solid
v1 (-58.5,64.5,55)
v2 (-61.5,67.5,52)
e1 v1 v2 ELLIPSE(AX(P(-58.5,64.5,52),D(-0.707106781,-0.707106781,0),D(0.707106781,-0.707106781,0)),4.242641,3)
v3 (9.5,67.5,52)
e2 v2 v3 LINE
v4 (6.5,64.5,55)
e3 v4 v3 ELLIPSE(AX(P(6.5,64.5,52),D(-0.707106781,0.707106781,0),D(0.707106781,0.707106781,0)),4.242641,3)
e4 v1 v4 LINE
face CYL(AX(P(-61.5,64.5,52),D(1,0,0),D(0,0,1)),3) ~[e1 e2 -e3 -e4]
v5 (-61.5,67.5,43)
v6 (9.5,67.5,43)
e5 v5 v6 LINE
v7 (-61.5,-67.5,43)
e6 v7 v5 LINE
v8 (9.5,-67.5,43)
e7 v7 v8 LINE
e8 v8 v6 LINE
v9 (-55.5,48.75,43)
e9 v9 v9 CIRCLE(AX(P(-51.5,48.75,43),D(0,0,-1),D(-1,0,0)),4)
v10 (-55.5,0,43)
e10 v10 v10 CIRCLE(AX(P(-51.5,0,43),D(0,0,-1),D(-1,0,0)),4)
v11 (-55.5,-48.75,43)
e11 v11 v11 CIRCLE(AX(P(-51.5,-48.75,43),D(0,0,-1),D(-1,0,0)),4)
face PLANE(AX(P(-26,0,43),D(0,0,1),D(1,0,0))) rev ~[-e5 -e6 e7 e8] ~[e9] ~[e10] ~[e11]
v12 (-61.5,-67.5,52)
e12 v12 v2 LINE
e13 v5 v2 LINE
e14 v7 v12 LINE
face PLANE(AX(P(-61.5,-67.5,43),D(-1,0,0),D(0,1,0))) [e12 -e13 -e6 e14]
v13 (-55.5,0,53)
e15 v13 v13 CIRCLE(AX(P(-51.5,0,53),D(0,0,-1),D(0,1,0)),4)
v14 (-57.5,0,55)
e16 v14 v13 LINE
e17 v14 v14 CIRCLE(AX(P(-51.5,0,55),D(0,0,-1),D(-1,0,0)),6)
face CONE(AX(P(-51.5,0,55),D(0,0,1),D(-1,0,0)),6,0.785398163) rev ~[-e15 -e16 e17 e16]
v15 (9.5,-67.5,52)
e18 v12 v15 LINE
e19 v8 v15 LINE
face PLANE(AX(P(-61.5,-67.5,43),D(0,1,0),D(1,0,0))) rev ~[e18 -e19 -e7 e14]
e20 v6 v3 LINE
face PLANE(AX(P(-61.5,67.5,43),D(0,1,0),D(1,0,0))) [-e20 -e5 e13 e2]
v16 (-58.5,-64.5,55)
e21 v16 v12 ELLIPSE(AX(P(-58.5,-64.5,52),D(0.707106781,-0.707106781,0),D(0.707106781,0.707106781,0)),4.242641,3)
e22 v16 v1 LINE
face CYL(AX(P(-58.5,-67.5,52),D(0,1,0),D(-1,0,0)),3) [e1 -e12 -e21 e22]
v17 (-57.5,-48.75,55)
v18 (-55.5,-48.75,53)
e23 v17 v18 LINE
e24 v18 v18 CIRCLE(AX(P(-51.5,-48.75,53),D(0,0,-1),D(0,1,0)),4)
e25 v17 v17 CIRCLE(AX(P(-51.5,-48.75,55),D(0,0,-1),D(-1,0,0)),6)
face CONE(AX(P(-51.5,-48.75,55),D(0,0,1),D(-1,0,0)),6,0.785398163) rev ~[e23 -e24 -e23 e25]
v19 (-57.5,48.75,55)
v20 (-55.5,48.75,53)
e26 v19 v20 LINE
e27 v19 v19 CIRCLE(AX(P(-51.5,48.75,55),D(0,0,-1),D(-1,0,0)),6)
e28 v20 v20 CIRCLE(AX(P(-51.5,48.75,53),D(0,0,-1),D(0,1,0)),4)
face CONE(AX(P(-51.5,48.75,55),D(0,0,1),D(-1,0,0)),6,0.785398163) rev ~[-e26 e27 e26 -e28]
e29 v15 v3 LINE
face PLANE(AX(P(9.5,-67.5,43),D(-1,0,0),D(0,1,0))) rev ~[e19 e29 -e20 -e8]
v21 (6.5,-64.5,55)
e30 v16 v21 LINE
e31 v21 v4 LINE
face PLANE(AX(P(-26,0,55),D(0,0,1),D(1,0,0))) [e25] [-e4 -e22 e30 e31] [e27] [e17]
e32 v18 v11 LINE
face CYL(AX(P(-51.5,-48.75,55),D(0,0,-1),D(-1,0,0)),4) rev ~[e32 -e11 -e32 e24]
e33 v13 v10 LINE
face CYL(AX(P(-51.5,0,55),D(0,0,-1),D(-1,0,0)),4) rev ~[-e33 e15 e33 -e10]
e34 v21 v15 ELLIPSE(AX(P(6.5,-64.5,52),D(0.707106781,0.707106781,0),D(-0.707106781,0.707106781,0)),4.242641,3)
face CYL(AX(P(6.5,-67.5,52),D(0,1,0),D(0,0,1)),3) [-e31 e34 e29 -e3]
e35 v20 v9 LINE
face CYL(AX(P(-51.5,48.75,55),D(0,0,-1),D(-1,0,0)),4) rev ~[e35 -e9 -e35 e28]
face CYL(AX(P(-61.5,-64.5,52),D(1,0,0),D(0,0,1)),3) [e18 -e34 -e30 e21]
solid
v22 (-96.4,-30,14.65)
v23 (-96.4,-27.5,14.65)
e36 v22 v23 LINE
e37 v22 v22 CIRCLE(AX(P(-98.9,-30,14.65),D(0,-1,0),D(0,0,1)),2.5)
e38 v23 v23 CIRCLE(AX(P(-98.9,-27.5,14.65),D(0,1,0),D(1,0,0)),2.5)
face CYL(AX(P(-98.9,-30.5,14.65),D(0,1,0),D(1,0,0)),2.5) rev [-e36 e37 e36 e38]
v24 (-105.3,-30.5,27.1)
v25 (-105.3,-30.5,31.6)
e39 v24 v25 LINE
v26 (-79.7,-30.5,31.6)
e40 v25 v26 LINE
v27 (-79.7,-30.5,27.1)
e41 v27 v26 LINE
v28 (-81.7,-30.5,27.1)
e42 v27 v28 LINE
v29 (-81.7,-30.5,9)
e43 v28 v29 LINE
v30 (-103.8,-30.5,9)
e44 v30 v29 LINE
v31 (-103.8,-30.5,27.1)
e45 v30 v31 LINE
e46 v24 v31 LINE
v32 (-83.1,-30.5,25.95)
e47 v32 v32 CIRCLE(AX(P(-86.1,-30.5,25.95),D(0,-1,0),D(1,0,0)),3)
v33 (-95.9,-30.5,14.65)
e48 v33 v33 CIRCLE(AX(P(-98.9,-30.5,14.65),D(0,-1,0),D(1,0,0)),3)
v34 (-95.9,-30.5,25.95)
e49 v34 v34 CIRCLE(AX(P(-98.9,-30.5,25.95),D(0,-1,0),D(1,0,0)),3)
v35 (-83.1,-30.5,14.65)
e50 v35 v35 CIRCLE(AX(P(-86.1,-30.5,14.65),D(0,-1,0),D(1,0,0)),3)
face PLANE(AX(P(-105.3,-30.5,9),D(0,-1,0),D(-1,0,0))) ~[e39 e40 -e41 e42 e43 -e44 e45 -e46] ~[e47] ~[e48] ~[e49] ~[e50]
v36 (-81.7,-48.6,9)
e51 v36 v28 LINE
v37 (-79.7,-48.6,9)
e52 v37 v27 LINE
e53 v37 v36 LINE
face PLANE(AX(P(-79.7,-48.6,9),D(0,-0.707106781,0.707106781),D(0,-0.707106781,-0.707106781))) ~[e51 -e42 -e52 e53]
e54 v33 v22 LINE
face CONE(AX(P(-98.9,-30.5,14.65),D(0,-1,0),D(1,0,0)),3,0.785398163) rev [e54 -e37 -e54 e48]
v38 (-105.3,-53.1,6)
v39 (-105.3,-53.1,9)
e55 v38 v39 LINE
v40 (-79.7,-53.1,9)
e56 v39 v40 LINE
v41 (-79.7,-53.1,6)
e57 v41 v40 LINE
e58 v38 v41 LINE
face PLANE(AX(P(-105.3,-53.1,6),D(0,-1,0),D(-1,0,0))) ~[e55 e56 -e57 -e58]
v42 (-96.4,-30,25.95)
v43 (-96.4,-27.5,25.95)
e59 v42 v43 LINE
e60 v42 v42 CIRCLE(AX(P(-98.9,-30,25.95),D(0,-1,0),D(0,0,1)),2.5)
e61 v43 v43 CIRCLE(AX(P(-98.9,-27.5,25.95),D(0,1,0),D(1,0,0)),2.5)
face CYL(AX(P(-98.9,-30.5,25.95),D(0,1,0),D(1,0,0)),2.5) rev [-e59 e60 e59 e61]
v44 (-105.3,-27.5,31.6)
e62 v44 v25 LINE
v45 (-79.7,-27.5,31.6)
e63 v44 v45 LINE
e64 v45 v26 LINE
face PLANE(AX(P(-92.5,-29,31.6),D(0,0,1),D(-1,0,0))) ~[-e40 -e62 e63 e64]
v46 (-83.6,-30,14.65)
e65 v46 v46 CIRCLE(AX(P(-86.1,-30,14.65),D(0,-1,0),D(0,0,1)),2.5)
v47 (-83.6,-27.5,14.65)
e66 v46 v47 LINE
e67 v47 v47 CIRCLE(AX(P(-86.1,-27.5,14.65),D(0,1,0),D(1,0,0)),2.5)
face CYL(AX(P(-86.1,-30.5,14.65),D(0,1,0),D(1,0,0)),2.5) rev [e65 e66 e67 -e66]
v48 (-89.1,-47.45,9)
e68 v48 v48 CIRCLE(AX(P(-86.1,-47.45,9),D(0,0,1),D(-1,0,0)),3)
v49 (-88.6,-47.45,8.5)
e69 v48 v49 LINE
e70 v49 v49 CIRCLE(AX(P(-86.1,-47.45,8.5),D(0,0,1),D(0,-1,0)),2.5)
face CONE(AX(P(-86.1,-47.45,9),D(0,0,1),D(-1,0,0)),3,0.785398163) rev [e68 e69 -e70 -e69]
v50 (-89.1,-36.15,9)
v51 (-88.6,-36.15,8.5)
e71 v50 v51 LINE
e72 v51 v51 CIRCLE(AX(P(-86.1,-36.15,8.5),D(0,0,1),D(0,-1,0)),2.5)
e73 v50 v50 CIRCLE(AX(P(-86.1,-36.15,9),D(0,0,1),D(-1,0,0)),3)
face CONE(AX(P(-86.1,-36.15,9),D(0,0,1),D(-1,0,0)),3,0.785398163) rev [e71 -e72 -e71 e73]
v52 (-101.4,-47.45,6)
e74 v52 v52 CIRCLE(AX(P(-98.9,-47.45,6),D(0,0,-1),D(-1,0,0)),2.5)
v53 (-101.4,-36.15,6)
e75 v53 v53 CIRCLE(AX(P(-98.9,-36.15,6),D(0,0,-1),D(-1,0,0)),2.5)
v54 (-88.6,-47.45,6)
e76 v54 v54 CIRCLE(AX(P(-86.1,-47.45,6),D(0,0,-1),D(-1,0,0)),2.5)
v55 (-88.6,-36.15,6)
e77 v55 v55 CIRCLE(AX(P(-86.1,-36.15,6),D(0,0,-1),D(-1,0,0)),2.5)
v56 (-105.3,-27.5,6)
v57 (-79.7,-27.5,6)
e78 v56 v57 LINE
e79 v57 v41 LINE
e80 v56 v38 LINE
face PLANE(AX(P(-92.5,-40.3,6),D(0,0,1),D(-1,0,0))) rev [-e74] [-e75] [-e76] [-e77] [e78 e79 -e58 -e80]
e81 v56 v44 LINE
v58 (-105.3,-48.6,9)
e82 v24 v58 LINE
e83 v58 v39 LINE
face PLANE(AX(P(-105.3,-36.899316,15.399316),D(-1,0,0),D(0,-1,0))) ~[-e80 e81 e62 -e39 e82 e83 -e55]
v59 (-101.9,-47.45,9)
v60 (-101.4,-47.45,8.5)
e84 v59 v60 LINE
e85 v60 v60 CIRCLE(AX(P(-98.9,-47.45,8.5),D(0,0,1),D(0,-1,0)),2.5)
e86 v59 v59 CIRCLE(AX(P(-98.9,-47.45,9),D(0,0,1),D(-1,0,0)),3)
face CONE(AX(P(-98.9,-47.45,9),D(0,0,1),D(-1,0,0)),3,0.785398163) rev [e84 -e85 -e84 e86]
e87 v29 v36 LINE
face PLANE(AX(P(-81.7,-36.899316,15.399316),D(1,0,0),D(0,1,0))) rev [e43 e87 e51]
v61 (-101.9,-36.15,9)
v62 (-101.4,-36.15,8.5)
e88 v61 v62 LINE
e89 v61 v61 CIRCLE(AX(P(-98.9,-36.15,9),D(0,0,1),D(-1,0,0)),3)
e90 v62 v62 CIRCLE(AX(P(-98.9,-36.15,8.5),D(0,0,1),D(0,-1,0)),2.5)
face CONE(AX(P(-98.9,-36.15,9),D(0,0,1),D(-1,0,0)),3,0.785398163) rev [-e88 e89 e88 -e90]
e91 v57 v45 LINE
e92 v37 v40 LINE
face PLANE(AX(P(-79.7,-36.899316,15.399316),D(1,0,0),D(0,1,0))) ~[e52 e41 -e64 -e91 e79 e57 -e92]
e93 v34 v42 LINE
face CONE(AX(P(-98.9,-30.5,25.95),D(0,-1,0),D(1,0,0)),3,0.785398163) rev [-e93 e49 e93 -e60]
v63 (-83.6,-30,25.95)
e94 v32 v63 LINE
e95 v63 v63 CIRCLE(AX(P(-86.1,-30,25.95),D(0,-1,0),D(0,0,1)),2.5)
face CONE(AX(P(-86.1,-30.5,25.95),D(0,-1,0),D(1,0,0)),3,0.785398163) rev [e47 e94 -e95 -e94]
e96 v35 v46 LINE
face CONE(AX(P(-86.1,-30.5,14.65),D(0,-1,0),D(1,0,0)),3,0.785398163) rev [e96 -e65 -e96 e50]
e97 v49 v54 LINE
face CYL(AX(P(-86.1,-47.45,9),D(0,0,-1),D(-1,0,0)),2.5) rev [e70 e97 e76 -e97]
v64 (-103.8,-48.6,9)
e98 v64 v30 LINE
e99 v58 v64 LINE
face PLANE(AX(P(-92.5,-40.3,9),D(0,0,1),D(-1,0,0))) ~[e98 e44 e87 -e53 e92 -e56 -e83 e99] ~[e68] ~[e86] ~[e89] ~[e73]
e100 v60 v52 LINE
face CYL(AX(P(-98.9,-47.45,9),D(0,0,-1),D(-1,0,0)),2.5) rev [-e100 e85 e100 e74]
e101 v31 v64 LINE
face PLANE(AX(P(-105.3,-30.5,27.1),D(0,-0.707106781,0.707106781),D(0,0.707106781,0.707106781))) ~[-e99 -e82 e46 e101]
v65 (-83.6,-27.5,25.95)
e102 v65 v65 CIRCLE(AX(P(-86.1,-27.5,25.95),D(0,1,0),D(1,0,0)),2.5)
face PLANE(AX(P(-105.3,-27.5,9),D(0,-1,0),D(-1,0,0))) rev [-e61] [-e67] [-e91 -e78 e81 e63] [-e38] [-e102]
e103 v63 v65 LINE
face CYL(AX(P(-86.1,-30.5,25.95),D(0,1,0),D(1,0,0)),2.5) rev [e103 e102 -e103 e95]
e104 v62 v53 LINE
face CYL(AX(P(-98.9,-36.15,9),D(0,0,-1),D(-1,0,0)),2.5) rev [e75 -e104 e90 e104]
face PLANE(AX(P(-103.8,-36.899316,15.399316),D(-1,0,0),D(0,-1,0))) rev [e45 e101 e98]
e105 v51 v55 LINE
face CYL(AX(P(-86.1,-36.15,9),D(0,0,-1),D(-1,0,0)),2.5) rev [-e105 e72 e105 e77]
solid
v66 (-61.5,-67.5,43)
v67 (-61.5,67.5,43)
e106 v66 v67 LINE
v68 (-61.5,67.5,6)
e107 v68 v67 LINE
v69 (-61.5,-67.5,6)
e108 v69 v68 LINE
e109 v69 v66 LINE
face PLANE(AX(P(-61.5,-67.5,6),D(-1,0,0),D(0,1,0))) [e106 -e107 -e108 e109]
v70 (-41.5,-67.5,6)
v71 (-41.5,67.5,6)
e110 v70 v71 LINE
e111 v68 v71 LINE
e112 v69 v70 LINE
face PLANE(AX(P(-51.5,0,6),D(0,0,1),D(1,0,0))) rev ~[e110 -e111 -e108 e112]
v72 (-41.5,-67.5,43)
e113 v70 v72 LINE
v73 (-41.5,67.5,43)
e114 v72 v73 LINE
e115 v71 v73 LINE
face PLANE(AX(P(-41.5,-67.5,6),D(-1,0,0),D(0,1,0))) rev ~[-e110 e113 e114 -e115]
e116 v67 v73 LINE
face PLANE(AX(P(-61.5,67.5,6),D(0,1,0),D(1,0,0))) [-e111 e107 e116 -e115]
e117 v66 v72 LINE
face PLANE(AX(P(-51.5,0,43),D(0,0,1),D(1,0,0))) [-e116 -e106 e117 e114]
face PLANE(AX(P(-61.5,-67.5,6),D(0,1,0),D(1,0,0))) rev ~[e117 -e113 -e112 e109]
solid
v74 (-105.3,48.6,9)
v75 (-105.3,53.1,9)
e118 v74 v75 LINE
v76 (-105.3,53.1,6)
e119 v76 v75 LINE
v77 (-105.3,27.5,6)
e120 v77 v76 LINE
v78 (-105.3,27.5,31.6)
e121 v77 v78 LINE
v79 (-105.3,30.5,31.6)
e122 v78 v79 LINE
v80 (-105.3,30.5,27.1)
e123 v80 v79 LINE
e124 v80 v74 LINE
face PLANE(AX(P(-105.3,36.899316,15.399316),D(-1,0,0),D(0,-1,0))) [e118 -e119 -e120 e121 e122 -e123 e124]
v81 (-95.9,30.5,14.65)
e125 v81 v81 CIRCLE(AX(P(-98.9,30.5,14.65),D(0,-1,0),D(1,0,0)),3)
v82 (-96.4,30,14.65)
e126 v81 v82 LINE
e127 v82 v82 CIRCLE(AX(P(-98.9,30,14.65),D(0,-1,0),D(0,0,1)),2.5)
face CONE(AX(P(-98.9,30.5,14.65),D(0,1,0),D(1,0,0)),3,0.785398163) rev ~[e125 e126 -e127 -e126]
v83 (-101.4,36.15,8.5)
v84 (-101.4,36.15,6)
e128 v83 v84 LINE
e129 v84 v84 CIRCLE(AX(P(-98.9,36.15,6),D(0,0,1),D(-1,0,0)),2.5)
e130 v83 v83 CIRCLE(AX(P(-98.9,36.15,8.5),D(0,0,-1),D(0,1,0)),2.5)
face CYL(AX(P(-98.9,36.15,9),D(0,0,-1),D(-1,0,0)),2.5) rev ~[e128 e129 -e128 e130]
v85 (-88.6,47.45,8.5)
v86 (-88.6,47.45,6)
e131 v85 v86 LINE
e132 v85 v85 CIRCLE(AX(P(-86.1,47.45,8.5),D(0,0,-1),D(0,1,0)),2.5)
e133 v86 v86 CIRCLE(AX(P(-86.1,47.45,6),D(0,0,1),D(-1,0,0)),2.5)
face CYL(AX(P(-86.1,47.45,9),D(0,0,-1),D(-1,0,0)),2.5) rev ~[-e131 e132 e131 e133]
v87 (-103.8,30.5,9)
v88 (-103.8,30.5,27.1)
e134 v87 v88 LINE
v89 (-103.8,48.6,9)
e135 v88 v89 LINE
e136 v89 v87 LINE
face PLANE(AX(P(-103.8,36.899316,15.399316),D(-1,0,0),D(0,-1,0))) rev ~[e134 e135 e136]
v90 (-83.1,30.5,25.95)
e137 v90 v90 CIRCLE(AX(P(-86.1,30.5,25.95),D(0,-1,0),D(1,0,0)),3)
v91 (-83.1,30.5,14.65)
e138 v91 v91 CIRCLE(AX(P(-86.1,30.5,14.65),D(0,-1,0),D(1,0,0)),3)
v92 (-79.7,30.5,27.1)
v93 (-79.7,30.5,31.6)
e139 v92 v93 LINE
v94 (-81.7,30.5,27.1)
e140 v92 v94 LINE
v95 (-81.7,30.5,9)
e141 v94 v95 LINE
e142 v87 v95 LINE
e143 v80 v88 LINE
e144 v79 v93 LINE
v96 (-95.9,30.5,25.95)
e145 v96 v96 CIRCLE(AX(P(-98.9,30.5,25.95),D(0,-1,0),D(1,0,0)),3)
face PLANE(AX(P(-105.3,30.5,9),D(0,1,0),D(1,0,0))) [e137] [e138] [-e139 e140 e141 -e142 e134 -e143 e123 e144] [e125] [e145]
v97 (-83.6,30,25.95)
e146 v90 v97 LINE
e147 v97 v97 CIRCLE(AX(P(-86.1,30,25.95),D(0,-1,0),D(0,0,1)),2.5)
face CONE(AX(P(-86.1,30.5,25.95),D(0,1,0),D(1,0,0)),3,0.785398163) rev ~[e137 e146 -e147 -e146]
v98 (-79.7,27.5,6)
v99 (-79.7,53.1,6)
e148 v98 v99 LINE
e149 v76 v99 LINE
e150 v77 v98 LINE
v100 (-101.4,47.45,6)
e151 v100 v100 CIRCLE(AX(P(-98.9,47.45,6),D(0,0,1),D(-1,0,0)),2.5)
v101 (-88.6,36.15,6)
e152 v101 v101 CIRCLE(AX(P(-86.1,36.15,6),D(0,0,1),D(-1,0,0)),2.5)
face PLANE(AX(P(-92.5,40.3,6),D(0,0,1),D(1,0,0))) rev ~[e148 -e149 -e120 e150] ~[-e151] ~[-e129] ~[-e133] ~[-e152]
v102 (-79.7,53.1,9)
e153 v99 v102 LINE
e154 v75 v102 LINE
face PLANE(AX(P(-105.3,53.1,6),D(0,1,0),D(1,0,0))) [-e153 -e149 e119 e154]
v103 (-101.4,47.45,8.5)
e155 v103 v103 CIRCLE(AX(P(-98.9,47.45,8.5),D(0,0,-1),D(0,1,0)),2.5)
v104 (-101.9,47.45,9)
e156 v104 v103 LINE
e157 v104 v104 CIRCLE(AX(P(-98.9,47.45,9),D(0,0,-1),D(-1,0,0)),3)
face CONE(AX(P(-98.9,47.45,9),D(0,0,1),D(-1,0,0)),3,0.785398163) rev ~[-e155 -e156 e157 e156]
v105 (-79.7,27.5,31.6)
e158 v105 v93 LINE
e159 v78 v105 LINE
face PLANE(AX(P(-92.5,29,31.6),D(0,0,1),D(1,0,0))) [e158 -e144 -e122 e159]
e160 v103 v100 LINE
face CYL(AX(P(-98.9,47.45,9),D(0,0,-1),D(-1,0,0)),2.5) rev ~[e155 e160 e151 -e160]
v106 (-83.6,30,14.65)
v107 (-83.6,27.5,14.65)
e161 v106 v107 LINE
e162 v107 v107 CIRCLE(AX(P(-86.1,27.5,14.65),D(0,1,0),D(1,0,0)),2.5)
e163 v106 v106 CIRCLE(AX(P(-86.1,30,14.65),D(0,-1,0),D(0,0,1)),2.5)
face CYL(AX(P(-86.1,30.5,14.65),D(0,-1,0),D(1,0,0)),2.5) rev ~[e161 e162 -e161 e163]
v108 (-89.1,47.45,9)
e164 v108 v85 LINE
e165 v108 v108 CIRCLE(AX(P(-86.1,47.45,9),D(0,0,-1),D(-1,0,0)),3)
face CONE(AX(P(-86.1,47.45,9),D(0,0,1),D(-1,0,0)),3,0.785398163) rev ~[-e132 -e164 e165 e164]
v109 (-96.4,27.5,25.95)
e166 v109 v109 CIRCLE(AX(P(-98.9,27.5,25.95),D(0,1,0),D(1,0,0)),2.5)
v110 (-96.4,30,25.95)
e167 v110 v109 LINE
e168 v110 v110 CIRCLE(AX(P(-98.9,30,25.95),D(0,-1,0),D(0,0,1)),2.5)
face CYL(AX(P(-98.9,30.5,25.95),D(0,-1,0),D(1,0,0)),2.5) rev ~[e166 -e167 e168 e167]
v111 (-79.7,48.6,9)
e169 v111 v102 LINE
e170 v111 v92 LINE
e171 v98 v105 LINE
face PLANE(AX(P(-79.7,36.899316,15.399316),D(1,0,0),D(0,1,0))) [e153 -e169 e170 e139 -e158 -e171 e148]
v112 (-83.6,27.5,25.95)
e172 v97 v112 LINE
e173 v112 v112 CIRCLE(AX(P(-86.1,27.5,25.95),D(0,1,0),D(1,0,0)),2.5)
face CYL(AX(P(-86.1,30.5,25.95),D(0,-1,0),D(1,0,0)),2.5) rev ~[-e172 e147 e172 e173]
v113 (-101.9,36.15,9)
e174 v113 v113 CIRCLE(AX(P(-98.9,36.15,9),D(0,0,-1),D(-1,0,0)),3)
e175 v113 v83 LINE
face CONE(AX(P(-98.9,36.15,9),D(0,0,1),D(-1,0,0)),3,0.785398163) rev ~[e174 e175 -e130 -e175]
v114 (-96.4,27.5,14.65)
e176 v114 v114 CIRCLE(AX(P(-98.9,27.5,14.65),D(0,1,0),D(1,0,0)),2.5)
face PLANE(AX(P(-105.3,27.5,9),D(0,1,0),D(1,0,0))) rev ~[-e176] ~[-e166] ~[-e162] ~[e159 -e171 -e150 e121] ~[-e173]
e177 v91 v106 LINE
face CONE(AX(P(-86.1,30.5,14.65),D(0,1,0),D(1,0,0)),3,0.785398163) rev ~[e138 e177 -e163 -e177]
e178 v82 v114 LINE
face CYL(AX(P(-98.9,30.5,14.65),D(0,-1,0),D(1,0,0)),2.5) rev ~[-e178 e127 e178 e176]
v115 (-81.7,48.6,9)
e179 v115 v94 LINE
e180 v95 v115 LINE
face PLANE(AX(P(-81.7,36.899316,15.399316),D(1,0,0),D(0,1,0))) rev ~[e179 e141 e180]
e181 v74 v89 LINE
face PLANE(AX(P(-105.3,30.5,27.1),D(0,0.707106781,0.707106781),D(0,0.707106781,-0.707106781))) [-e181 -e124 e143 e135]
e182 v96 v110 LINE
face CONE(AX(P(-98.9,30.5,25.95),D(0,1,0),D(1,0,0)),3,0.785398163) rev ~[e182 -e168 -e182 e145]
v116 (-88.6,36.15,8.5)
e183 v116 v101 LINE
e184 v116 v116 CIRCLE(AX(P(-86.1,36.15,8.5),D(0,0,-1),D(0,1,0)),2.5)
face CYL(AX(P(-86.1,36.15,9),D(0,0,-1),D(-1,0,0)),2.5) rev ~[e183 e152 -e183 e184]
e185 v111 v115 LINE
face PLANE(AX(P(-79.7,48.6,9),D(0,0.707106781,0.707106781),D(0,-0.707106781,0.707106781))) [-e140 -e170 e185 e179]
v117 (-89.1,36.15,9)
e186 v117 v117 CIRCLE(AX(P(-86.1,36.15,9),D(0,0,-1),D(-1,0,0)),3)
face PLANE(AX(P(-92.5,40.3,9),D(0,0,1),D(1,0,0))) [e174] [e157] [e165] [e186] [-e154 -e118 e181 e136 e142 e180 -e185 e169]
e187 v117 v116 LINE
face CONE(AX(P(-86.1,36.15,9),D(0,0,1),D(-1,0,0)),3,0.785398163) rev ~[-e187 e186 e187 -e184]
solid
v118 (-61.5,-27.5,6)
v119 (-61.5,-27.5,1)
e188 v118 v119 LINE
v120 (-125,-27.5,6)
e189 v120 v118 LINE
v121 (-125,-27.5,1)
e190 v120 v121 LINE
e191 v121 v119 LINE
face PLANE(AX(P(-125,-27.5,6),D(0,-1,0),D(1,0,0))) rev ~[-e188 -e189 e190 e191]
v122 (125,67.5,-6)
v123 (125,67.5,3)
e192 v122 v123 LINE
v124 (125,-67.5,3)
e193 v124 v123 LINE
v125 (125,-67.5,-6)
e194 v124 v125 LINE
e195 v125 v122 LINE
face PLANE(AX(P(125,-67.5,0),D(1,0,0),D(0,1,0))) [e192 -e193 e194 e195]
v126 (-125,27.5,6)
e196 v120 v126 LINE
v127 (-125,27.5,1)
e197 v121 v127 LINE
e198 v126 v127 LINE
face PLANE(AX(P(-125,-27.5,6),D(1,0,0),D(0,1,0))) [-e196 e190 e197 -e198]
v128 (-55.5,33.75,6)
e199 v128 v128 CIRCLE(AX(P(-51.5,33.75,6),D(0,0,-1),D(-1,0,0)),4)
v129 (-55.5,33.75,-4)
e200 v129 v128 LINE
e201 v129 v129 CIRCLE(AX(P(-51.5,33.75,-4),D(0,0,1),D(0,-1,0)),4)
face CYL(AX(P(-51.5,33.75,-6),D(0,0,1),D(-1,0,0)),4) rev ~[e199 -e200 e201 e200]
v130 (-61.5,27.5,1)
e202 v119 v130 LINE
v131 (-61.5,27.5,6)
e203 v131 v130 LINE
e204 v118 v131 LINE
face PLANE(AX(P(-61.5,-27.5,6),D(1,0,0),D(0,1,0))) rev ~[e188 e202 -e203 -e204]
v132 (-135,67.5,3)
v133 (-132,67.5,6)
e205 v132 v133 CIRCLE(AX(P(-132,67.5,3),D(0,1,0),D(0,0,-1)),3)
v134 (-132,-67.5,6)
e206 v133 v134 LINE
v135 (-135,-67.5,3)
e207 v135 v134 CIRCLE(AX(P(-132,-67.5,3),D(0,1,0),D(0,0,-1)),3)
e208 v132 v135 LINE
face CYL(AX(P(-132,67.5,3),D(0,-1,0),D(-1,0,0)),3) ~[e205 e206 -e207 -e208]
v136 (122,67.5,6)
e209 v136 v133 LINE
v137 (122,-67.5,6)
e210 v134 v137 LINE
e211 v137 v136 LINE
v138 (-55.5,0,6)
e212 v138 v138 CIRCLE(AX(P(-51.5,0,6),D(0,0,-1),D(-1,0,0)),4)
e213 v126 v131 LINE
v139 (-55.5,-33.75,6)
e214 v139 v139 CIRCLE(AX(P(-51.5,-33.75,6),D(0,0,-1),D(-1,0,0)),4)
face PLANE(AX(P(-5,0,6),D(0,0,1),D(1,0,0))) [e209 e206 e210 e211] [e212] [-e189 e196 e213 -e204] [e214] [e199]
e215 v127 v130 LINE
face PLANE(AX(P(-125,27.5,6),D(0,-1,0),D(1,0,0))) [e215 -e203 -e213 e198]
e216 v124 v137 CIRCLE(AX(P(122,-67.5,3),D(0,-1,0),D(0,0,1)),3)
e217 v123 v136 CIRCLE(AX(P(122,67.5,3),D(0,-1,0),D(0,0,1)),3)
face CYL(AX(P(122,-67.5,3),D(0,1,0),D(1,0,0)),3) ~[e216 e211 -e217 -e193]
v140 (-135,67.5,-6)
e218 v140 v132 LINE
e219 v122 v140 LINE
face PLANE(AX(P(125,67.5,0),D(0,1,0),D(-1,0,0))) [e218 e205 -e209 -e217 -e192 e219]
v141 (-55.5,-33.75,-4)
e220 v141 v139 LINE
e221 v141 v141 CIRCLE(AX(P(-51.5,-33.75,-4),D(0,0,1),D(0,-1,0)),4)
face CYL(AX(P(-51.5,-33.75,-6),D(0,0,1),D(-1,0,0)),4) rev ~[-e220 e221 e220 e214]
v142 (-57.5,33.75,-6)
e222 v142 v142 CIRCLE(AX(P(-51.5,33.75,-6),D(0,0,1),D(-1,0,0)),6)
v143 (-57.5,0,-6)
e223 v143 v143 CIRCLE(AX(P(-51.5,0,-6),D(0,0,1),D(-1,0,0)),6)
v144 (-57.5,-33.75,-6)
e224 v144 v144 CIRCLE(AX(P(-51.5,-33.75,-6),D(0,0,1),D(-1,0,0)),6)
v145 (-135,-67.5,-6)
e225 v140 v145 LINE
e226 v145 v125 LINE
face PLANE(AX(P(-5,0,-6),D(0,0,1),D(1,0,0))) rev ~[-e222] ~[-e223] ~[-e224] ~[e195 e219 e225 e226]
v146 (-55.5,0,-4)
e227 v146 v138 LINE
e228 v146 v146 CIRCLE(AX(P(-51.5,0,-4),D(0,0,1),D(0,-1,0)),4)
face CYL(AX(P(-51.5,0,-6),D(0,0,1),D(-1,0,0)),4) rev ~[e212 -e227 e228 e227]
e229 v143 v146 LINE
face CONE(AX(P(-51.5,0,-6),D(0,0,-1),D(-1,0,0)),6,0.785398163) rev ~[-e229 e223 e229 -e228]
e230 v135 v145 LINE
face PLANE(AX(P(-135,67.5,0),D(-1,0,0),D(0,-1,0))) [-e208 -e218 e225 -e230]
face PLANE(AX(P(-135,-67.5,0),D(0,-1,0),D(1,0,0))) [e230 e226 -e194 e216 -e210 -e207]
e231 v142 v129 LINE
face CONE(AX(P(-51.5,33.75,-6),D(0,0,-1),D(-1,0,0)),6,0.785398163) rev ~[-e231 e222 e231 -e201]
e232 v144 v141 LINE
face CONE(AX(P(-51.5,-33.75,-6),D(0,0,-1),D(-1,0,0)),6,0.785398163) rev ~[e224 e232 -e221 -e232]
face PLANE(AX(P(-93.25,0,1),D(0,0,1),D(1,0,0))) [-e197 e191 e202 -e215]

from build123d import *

# Parameters (mm, degrees)
F1_DEPTH        = 6
F2_W            = 63.5
F2_H            = 55
F3_DEPTH        = 5
F4_W            = 20
F4_H            = 135
F5_DEPTH        = 37
F7_D            = 8
F7_DEPTH        = 12
F7_CSINK_D      = 12
F7_CSINK_ANGLE  = 90
F7_TIP          = 2.4034424761
F8_W            = 71
F8_H            = 135
F9_DEPTH        = 12
F11_D           = 8
F11_DEPTH       = 12
F11_CSINK_D     = 12
F11_CSINK_ANGLE = 90
F11_TIP         = 2.4034424761
F12_R           = 3
F12_2_R         = 3
F13_W           = 25.6
F13_H           = 25.6
F14_DEPTH       = 3
F15_W           = 25.6
F15_H           = 3
F16_DEPTH       = 22.6
F18_D           = 5
F18_DEPTH       = 3
F18_CSINK_D     = 6
F18_CSINK_ANGLE = 90
F18_TIP         = 1.5021515476
F20_D           = 5
F20_DEPTH       = 3
F20_CSINK_D     = 6
F20_CSINK_ANGLE = 90
F20_TIP         = 1.5021515476
F22_DEPTH       = 1.5
F24_DEPTH       = 2


# Not quite as in the source:
# - a feature names something its author has since deleted; it is built from what else it names


with BuildPart() as f1:
    # F0 (on Top) → F1 (new body, symmetric)
    with BuildSketch(Plane.XY):
        Polygon((125, -67.5), (125, 67.5), (-125, 67.5), (-135, 67.5), (-135, -67.5), align=None)
    extrude(amount=F1_DEPTH, both=True)

    # F2 (on face) → F3 (cut)
    with BuildSketch(Plane.XY.offset(6)):
        with Locations((-93.25, 0)):
            Rectangle(F2_W, F2_H)
    extrude(amount=-F3_DEPTH, mode=Mode.SUBTRACT)

    # F7
    with Locations(Plane(origin=(0, 0, -6), x_dir=(1, 0, 0), z_dir=(0, 0, -1))):
        with Locations((-51.5, 33.75), (-51.5, 0), (-51.5, -33.75)):
            CounterSinkHole(F7_D / 2, F7_CSINK_D / 2, depth=F7_DEPTH, counter_sink_angle=F7_CSINK_ANGLE)
            with Locations((0, 0, -(F7_DEPTH + F7_TIP / 2))):  # 118° drill point
                Cone(0, F7_D / 2, F7_TIP, mode=Mode.SUBTRACT)

    # F12
    f12_edges = [f1.edges().sort_by_distance(p)[0] for p in [
        (125, 0, 6),
        (-135, 0, 6),
    ]]
    fillet(f12_edges, radius=F12_R)


with BuildPart() as f5:
    # F4 (on face) → F5 (new body)
    with BuildSketch(Plane.XY.offset(6)):
        with Locations((-51.5, 0)):
            Rectangle(F4_W, F4_H)
    extrude(amount=F5_DEPTH)


with BuildPart() as f9:
    # F8 (on face) → F9 (new body)
    with BuildSketch(Plane.XY.offset(43)):
        with Locations((-26, 0)):
            Rectangle(F8_W, F8_H)
    extrude(amount=F9_DEPTH)

    # F11
    with Locations(Plane.XY.offset(55)):
        with Locations((-51.5, 48.75), (-51.5, 0), (-51.5, -48.75)):
            CounterSinkHole(F11_D / 2, F11_CSINK_D / 2, depth=F11_DEPTH, counter_sink_angle=F11_CSINK_ANGLE)
            with Locations((0, 0, -(F11_DEPTH + F11_TIP / 2))):  # 118° drill point
                Cone(0, F11_D / 2, F11_TIP, mode=Mode.SUBTRACT)

    # F12#2
    f12_2_edges = [f9.edges().sort_by_distance(p)[0] for p in [
        (9.5, 0, 55),
        (-26, -67.5, 55),
        (-26, 67.5, 55),
        (-61.5, 0, 55),
    ]]
    fillet(f12_2_edges, radius=F12_2_R)


with BuildPart() as f14:
    # F13 (on face) → F14 (new body)
    with BuildSketch(Plane.XY.offset(6)):
        with Locations((-92.5, 40.3)):
            Rectangle(F13_W, F13_H)
    extrude(amount=F14_DEPTH)

    # F15 (on face) → F16 (join)
    with BuildSketch(Plane.XY.offset(9)):
        with Locations((-92.5, 29)):
            Rectangle(F15_W, F15_H)
    extrude(amount=F16_DEPTH)

    # F18
    with Locations(Plane(origin=(0, 30.5, 0), x_dir=(-1, 0, 0), z_dir=(0, 1, 0))):
        with Locations((86.1, 25.95), (98.9, 25.95), (86.1, 14.65), (98.9, 14.65)):
            CounterSinkHole(F18_D / 2, F18_CSINK_D / 2, depth=F18_DEPTH, counter_sink_angle=F18_CSINK_ANGLE)
            with Locations((0, 0, -(F18_DEPTH + F18_TIP / 2))):  # 118° drill point
                Cone(0, F18_D / 2, F18_TIP, mode=Mode.SUBTRACT)

    # F20
    with Locations(Plane.XY.offset(9)):
        with Locations((-86.1, 36.15), (-98.9, 36.15), (-98.9, 47.45), (-86.1, 47.45)):
            CounterSinkHole(F20_D / 2, F20_CSINK_D / 2, depth=F20_DEPTH, counter_sink_angle=F20_CSINK_ANGLE)
            with Locations((0, 0, -(F20_DEPTH + F20_TIP / 2))):  # 118° drill point
                Cone(0, F20_D / 2, F20_TIP, mode=Mode.SUBTRACT)

    # F21 (on face) → F22 (join)
    with BuildSketch(Plane(origin=(-105.3, 0, 0), x_dir=(0, -1, 0), z_dir=(-1, 0, 0))):
        Polygon((-30.5, 9), (-30.5, 27.1), (-48.6, 9), align=None)
    extrude(amount=-F22_DEPTH)

    # F23 (on face) → F24 (join)
    with BuildSketch(Plane.YZ.offset(-79.7)):
        Polygon((30.5, 27.1), (30.5, 9), (48.6, 9), align=None)
    extrude(amount=-F24_DEPTH)


with BuildPart() as f25_1:
    # F25: instance of F14
    add(f14.part.mirror(Plane.XZ))


solid = Compound([f1.part, f5.part, f9.part, f14.part, f25_1.part])
